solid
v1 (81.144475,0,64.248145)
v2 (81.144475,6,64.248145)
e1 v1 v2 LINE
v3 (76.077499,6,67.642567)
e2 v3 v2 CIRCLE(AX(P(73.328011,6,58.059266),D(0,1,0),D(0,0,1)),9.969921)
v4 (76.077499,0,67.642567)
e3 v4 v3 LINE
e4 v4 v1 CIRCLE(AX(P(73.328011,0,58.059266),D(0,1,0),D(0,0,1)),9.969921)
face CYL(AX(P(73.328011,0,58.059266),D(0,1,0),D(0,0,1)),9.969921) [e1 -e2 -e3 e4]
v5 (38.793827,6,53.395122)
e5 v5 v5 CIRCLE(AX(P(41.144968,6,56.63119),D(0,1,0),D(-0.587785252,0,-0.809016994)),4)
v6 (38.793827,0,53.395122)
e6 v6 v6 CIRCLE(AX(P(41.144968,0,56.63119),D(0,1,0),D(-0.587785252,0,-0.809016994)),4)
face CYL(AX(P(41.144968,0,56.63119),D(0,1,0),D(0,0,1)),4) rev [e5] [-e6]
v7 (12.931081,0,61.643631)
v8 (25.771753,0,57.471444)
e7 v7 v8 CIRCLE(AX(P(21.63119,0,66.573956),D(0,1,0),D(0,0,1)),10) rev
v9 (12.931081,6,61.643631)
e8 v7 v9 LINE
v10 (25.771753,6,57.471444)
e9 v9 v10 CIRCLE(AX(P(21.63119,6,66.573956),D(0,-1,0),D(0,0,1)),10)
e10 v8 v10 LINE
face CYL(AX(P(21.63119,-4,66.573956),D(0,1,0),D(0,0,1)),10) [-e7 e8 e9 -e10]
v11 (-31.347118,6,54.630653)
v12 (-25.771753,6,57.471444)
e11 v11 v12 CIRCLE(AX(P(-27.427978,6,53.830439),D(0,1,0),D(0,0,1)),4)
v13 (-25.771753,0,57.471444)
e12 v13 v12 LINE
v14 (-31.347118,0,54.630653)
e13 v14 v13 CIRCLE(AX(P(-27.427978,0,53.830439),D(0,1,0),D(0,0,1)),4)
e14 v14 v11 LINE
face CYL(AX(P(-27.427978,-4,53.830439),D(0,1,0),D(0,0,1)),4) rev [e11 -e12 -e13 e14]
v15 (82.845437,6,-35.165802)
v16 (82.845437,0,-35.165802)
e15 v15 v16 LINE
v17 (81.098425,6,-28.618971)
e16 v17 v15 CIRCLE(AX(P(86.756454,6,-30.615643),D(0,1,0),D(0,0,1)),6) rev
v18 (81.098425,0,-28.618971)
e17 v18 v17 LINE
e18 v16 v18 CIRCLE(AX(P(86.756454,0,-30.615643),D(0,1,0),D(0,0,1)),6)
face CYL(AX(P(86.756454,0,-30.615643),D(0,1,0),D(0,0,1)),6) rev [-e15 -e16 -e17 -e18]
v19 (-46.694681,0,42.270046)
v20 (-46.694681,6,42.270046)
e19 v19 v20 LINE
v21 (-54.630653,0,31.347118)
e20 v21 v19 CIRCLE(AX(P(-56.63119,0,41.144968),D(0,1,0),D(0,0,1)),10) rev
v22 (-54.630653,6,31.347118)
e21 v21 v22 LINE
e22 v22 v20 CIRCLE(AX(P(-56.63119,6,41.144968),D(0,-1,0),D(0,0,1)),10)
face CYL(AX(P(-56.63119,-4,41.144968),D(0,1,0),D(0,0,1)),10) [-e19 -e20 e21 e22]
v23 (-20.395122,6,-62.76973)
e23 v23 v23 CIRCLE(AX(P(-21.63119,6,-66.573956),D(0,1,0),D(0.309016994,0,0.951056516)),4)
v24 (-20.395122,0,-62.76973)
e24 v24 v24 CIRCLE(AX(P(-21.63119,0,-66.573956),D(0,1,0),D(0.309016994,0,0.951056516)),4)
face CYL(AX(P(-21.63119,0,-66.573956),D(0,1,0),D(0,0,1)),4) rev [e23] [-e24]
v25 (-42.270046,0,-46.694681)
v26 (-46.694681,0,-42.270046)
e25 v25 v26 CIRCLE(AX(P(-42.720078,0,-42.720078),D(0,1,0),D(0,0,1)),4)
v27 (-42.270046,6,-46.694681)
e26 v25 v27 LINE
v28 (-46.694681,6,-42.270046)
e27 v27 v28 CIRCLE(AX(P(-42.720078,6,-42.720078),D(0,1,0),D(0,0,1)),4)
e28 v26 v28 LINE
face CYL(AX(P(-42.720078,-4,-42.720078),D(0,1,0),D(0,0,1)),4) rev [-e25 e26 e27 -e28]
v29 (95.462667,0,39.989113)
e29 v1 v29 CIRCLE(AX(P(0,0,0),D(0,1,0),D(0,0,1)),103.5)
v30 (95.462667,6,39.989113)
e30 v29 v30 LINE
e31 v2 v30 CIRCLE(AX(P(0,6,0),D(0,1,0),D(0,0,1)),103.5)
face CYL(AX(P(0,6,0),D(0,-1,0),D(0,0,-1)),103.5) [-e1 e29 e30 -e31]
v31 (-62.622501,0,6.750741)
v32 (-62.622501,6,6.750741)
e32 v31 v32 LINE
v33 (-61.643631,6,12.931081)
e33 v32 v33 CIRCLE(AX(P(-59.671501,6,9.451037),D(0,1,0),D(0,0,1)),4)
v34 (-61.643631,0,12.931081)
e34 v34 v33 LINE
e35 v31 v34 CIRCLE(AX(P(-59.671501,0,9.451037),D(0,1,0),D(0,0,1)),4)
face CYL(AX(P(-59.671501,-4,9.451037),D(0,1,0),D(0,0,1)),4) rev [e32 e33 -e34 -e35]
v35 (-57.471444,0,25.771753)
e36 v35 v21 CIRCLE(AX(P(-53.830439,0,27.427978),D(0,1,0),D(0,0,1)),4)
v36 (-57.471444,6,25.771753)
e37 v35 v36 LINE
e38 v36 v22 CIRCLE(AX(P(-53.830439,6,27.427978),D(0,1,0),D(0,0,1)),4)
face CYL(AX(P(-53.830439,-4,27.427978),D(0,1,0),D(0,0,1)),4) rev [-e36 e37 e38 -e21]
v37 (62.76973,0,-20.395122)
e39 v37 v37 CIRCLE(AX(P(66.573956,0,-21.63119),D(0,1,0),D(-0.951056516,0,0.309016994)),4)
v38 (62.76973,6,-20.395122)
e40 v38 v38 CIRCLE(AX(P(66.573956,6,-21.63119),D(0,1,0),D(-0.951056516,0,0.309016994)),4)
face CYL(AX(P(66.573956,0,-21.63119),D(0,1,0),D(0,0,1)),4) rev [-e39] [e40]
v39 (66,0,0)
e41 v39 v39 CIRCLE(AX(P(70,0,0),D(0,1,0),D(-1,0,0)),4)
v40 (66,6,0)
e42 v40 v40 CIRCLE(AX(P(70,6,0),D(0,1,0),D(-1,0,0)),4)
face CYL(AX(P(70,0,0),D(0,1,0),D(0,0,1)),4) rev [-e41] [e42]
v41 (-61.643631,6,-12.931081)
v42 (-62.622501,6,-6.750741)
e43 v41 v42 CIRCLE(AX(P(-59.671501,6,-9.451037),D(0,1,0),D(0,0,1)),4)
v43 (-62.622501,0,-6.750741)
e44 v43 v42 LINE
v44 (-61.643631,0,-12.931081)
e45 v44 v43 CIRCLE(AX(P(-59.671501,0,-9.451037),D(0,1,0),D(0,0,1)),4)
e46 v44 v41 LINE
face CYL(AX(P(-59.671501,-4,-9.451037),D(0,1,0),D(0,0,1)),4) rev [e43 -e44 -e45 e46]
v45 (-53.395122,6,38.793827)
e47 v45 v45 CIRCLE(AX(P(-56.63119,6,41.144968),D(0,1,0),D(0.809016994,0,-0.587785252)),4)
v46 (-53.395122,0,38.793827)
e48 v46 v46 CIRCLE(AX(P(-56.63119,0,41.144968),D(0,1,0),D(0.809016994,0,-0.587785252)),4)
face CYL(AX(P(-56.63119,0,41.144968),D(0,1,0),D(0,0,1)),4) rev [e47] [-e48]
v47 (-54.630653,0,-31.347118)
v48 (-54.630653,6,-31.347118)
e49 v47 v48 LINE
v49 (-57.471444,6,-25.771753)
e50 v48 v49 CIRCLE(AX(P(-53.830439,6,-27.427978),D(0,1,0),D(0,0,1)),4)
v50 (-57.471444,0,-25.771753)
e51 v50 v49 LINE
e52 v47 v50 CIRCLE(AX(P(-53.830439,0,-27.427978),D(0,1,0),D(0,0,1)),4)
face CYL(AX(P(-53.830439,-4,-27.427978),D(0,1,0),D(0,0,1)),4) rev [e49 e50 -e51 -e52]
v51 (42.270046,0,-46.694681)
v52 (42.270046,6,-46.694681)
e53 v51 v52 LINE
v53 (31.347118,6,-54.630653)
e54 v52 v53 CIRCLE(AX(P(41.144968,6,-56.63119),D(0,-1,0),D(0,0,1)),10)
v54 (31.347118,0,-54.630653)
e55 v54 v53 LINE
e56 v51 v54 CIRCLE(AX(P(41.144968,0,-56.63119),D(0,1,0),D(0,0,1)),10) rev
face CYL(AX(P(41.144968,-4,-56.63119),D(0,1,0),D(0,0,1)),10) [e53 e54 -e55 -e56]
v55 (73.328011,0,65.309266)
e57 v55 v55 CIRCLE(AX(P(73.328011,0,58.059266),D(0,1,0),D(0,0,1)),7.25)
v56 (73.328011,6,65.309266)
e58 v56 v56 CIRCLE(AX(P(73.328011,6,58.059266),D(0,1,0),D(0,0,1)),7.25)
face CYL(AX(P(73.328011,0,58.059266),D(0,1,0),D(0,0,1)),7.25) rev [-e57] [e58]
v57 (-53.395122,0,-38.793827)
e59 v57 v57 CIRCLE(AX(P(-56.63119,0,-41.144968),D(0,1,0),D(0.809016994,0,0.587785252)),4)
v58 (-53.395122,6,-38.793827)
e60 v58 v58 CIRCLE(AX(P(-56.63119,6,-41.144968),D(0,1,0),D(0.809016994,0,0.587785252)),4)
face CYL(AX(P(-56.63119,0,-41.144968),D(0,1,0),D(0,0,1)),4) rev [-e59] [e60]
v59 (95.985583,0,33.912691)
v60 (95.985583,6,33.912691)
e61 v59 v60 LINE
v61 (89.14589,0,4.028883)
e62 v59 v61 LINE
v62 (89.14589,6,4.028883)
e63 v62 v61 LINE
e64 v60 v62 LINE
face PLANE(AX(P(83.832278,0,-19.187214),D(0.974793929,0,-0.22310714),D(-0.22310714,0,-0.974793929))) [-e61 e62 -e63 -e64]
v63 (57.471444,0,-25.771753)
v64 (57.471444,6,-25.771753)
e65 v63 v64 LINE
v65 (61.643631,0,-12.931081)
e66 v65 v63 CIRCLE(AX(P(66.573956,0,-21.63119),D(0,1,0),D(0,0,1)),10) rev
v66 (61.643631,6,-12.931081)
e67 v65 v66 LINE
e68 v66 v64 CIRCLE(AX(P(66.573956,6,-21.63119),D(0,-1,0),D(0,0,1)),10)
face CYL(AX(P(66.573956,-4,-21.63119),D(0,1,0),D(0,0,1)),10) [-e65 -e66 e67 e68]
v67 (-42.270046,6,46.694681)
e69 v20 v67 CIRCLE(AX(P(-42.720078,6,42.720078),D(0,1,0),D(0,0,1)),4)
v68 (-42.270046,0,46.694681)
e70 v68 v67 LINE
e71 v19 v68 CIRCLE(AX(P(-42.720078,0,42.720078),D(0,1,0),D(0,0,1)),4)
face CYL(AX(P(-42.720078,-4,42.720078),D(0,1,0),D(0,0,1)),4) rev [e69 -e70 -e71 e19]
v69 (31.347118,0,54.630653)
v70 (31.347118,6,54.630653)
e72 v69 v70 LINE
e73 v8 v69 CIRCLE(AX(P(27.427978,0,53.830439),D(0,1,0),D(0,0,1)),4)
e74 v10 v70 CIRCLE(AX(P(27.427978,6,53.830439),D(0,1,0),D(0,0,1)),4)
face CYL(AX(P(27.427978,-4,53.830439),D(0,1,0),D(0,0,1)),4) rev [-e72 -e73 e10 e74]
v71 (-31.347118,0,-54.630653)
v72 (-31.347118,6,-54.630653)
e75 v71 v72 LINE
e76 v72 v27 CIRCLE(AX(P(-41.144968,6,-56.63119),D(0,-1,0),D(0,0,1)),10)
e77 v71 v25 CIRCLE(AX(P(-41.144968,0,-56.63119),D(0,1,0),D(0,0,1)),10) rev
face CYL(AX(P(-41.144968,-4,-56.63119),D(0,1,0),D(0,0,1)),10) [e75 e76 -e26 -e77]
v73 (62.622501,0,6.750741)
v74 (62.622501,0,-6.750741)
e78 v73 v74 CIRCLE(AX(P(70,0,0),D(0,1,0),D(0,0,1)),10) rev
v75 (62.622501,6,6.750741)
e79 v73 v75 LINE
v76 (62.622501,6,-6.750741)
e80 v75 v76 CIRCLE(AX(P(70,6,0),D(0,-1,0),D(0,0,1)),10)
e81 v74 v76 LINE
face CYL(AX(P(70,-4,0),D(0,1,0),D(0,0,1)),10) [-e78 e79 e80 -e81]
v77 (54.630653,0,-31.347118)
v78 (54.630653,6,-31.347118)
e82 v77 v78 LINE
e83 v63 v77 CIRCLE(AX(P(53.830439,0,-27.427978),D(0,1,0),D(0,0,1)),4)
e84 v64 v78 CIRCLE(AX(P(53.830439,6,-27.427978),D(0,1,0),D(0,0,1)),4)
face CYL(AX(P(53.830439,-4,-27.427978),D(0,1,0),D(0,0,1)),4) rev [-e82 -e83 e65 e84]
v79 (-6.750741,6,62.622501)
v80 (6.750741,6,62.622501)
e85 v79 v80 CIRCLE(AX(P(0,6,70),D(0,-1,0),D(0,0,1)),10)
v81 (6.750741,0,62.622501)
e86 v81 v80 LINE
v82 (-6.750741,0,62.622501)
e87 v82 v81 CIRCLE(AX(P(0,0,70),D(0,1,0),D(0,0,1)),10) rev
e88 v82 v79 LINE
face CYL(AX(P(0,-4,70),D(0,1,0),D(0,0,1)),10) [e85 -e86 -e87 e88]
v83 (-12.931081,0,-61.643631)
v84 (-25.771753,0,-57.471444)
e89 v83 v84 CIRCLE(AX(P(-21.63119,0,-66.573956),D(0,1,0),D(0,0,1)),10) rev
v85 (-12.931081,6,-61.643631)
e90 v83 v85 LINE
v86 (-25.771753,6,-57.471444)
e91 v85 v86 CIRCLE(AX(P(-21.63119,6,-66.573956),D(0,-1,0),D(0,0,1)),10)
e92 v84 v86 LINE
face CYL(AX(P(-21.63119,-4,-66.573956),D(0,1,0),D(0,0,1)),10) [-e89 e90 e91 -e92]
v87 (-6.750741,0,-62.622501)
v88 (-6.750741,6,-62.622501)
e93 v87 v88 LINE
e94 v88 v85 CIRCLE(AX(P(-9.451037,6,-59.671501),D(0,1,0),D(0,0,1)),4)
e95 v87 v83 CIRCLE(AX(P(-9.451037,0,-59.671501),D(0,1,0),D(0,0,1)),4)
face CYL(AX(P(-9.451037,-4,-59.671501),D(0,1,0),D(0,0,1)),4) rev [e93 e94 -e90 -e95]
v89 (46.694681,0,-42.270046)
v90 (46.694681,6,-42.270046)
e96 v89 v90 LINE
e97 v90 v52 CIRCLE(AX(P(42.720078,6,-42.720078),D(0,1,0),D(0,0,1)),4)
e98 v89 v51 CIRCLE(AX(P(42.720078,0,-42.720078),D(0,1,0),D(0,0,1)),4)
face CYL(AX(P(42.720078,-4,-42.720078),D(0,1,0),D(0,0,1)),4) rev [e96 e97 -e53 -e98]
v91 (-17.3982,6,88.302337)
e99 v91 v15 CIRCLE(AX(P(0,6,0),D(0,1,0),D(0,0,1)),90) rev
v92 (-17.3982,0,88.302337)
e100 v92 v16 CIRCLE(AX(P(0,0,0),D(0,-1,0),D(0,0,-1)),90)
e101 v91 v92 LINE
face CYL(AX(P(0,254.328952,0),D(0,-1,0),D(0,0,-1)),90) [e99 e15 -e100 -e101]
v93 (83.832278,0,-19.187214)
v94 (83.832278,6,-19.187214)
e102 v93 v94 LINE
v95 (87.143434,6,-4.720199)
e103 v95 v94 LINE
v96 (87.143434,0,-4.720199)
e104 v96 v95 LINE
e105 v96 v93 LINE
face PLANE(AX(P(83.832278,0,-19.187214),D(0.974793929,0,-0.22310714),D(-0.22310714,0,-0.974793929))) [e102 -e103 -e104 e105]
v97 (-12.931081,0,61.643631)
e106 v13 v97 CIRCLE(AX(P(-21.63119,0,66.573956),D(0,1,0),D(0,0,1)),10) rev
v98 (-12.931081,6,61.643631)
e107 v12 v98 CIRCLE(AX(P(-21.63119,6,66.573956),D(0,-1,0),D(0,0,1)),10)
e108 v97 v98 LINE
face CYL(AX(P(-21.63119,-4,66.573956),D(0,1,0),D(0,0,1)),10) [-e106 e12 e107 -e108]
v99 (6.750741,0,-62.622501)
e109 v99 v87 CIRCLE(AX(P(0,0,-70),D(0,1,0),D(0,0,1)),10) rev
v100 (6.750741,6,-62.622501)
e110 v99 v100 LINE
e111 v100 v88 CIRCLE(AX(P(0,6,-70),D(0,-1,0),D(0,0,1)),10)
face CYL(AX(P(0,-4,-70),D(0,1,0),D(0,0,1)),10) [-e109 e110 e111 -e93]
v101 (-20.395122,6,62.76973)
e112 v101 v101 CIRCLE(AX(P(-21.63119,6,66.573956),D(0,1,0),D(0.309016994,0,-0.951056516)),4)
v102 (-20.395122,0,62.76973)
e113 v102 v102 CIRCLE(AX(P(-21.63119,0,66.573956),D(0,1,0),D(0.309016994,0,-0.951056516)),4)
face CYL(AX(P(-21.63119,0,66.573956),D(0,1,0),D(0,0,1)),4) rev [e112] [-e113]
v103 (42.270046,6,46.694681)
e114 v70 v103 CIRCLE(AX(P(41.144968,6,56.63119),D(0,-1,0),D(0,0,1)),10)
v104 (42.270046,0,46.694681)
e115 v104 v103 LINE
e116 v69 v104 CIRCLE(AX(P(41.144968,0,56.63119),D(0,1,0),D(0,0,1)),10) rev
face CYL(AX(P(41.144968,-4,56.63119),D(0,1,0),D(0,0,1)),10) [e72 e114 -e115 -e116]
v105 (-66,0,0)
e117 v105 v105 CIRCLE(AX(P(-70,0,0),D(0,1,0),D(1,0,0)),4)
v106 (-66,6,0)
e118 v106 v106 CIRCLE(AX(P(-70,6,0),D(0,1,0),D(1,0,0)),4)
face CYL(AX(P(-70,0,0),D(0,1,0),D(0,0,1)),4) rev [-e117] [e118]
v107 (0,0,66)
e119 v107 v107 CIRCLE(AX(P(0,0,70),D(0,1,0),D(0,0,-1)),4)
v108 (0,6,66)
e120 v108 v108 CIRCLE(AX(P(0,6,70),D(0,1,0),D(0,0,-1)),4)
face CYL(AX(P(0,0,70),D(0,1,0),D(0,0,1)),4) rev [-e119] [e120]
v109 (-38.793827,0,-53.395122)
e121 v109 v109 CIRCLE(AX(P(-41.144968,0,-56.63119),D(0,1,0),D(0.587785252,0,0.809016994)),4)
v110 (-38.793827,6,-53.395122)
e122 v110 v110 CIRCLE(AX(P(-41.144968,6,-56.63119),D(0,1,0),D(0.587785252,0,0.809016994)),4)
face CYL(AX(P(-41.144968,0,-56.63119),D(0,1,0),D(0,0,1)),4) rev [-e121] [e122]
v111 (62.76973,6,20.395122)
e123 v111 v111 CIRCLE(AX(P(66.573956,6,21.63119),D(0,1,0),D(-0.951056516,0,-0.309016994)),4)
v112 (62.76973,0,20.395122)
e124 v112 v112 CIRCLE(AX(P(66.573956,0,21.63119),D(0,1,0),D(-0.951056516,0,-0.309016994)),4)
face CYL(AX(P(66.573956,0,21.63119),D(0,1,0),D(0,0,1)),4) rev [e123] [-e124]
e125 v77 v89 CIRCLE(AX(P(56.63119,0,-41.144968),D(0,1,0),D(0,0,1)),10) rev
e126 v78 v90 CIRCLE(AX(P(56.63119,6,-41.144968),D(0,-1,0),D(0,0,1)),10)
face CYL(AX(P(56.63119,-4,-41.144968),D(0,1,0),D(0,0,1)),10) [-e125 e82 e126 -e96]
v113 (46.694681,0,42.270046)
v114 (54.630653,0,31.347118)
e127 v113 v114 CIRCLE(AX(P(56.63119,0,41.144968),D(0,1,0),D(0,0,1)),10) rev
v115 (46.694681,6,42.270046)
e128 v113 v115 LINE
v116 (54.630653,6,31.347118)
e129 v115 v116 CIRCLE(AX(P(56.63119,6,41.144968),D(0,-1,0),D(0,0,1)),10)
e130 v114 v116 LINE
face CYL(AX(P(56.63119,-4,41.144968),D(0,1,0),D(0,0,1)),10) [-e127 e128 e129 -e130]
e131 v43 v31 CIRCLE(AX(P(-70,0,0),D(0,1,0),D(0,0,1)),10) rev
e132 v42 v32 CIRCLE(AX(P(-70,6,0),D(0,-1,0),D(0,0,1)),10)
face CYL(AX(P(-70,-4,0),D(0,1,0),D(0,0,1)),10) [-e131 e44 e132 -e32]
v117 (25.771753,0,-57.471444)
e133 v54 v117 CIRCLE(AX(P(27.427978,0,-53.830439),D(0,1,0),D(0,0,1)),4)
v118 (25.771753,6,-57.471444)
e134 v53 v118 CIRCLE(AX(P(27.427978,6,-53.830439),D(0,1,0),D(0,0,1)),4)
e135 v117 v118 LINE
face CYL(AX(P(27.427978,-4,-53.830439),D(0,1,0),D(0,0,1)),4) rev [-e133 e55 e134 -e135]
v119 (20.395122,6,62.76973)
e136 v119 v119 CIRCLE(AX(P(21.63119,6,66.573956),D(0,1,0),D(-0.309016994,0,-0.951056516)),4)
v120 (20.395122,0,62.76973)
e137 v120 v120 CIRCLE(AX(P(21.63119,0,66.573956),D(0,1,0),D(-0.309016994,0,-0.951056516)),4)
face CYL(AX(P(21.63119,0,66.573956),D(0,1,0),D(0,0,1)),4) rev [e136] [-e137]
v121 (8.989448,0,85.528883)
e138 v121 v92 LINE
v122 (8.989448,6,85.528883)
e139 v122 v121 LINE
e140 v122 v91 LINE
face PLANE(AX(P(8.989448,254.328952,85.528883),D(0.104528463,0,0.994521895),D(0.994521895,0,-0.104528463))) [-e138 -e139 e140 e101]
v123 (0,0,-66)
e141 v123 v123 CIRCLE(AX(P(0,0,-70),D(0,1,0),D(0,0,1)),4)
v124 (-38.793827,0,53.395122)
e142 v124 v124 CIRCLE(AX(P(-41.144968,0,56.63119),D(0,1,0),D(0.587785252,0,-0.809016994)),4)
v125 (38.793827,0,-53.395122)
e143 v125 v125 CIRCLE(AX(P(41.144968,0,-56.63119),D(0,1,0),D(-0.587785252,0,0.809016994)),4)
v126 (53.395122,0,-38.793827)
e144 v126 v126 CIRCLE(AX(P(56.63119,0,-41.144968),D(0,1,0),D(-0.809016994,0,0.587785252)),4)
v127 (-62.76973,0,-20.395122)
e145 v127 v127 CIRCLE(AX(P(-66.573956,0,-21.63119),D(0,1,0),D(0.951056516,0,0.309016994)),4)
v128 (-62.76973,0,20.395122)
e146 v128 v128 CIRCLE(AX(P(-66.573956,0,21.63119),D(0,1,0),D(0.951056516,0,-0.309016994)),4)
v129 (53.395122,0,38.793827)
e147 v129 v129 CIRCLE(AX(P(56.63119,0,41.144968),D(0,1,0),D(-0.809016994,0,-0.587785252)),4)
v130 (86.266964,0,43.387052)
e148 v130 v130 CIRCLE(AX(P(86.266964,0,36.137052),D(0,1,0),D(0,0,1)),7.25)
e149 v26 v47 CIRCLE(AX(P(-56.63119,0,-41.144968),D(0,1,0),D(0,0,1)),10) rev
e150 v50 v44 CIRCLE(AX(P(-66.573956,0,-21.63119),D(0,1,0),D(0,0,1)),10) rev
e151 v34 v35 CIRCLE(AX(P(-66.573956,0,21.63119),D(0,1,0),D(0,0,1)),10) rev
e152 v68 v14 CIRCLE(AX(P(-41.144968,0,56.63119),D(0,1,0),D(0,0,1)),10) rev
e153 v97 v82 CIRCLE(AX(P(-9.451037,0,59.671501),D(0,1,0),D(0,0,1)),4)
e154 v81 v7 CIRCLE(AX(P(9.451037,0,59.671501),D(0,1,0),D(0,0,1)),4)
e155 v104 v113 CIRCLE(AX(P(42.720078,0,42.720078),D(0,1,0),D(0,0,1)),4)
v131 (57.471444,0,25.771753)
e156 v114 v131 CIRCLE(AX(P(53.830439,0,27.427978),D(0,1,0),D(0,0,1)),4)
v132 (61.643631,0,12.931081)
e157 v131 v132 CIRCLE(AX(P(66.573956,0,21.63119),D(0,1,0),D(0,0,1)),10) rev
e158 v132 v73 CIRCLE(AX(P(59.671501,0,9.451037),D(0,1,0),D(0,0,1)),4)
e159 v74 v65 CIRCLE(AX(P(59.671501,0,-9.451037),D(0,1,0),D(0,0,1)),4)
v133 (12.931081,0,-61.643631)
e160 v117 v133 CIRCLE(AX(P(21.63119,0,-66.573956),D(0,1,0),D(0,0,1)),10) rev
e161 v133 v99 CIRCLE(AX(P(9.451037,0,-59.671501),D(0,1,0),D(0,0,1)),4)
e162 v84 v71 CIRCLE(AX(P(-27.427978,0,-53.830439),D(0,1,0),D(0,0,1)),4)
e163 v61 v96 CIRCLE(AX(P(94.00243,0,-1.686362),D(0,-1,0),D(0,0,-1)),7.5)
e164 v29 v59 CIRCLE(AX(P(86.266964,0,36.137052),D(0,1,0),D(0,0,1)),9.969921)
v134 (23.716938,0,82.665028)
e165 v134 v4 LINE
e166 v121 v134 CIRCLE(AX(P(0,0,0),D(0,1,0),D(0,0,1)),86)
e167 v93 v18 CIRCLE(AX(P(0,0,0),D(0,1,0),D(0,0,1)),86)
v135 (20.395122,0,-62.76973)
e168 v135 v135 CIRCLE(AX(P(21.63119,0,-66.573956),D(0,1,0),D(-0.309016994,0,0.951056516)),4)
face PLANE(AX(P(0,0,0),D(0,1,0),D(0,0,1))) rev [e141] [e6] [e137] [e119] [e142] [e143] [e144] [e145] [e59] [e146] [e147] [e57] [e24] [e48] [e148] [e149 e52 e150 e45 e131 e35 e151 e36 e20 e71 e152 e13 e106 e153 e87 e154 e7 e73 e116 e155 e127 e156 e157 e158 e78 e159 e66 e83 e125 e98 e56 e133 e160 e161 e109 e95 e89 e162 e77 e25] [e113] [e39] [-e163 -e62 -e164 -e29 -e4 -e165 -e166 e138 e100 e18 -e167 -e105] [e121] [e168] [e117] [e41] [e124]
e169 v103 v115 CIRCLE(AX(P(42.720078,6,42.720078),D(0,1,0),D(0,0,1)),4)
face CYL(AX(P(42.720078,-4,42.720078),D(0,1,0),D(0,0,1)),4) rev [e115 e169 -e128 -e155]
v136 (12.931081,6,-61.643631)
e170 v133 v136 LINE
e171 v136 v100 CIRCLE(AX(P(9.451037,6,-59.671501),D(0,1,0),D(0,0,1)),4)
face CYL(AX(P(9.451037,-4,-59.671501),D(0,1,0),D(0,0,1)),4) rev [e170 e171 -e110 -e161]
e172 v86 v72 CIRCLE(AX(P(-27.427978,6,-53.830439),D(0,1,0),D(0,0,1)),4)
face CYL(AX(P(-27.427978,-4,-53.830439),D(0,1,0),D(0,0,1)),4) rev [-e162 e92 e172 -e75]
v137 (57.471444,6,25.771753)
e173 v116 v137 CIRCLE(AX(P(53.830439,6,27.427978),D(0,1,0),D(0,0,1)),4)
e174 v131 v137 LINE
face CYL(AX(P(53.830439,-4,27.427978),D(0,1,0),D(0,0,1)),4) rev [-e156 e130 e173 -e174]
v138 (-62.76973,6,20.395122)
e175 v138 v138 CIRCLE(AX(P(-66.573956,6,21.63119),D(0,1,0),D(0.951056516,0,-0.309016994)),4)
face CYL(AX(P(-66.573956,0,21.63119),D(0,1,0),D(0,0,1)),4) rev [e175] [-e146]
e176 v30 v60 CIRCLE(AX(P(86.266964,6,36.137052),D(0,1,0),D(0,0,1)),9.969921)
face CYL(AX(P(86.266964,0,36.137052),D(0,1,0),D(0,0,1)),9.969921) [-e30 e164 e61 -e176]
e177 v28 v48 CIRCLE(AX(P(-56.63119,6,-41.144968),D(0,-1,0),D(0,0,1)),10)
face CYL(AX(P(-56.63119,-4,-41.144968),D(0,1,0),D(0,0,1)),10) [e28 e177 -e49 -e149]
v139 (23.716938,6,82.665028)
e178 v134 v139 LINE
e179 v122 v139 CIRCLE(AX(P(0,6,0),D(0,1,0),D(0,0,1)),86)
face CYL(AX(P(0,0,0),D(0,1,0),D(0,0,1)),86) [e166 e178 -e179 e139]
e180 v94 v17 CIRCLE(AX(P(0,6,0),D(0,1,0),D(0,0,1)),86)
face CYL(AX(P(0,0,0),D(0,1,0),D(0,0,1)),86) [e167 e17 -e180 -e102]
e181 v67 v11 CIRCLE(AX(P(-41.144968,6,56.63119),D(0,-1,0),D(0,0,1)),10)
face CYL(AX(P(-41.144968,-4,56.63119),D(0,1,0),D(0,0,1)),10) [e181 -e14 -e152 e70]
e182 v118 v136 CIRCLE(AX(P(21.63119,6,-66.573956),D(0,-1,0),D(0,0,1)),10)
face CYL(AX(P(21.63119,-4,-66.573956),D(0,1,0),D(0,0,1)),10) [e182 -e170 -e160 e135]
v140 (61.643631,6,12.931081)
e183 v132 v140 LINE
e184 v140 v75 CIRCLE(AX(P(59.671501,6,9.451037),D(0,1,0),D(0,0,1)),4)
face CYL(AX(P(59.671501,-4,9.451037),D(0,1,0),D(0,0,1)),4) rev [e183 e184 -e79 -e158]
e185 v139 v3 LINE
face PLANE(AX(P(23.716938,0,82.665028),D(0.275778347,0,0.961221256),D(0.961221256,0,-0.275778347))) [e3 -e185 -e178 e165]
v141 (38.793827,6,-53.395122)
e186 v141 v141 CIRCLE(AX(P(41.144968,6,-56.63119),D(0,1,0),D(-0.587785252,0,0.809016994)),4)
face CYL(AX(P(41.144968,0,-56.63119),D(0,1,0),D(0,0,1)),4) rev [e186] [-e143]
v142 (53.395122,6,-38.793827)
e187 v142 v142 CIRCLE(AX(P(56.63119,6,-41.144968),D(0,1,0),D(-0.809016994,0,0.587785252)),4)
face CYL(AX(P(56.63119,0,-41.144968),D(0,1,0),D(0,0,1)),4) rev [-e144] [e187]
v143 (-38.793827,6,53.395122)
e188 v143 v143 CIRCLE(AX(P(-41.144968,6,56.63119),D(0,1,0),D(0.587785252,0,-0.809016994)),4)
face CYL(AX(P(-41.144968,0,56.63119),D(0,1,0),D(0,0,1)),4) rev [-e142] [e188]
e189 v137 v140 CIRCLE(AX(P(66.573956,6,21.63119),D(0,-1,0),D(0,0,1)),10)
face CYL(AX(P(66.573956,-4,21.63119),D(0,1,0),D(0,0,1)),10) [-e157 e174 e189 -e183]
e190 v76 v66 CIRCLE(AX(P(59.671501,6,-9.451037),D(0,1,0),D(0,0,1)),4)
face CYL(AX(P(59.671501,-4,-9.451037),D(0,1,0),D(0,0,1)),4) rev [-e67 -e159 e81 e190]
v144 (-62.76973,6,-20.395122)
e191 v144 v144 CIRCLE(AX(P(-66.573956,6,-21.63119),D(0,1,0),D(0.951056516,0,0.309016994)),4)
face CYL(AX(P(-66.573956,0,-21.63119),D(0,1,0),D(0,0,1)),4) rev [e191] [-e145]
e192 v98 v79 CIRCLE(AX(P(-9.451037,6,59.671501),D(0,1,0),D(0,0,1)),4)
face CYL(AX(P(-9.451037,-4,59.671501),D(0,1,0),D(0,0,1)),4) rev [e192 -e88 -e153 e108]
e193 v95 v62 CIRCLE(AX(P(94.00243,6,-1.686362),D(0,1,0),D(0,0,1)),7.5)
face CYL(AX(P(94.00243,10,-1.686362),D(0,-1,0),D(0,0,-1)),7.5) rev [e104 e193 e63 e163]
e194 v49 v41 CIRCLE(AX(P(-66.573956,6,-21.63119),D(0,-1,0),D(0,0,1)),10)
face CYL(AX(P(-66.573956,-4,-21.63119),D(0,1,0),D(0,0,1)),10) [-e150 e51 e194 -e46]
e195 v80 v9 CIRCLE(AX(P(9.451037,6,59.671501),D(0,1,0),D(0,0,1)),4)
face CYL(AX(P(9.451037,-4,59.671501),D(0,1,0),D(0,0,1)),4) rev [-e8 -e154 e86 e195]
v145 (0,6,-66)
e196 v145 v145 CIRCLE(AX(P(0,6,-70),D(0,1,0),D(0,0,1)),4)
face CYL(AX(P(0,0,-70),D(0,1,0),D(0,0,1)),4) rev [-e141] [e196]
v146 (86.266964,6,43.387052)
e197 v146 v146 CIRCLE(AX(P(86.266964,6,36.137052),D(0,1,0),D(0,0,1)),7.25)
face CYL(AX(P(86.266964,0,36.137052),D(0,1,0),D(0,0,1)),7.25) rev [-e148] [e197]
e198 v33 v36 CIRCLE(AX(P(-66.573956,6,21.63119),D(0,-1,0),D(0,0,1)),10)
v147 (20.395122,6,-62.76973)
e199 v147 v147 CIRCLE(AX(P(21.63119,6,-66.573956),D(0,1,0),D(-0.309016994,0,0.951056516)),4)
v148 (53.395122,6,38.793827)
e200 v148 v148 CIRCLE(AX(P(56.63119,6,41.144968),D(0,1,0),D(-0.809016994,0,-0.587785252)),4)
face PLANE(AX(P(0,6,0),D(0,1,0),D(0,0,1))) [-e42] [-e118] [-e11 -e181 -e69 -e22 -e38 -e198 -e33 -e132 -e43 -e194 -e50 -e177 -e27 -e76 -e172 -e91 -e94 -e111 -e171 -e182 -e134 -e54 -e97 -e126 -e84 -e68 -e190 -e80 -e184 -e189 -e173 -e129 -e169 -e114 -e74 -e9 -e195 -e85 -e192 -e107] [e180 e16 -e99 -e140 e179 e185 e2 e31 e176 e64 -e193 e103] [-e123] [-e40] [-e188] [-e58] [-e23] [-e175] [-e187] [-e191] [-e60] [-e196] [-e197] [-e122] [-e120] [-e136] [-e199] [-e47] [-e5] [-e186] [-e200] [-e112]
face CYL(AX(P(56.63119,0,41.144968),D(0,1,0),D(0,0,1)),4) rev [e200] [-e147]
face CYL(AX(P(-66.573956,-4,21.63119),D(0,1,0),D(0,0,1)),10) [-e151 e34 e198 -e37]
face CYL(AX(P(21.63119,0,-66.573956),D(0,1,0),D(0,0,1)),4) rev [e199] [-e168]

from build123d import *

# Parameters (mm, degrees)
SKETCH1_R           = 103.5
SKETCH1_R_2         = 60
BOSS_EXTRUDE1_DEPTH = 6
SKETCH2_R           = 4
CUT_EXTRUDE1_DEPTH  = 147.494027182
CIRPATTERN1_COUNT   = 20
SKETCH3_R           = 7.25
CUT_EXTRUDE2_DEPTH  = 6
SKETCH4_OUTSIDE_W   = 267.56
SKETCH4_OUTSIDE_H   = 267.56
CUT_EXTRUDE3_DEPTH  = 147.494027182
CUT_EXTRUDE4_DEPTH  = 10
BOSS_EXTRUDE2_START = -6
BOSS_EXTRUDE2_DEPTH = 6
FILLET1_R           = 6
SKETCH7_R           = 7.5
CUT_EXTRUDE5_DEPTH  = 10


with BuildPart() as part:
    # Sketch1 → Boss-Extrude1 (new body)
    with BuildSketch(Plane(origin=(0, 0, 0), x_dir=(1, 0, 0), z_dir=(0, 1, 0))):
        with Locations(Location((0, 0, 0), (0, 0, 270))):
            Circle(SKETCH1_R)
        with Locations(Location((0, 0, 0), (0, 0, 270))):
            Circle(SKETCH1_R_2, mode=Mode.SUBTRACT)
    extrude(amount=BOSS_EXTRUDE1_DEPTH)

    # Sketch2 → Cut-Extrude1 (cut, through all)
    with BuildSketch(Plane(origin=(0, 6, 0), x_dir=(1, 0, 0), z_dir=(0, 1, 0))):
        with Locations(Location((0, 70, 0), (0, 0, 270))):
            Circle(SKETCH2_R)
    cut_extrude1 = extrude(amount=-CUT_EXTRUDE1_DEPTH, mode=Mode.SUBTRACT)

    # CirPattern1: Cut-Extrude1 ×20 about axis
    cirpattern1_axis = Axis((0, 0, 0), (0, 1, 0))
    for i in range(1, CIRPATTERN1_COUNT):
        add(cut_extrude1.rotate(cirpattern1_axis, i * 360 / CIRPATTERN1_COUNT), mode=Mode.SUBTRACT)

    # Sketch3 → Cut-Extrude2 (cut)
    with BuildSketch(Plane(origin=(0, 6, 0), x_dir=(1, 0, 0), z_dir=(0, 1, 0))):
        with Locations(Location((86.266964059, -36.13705179, 0), (0, 0, 270))):
            Circle(SKETCH3_R)
        with Locations(Location((73.328010939, -58.059266372, 0), (0, 0, 270))):
            Circle(SKETCH3_R)
    extrude(amount=-CUT_EXTRUDE2_DEPTH, mode=Mode.SUBTRACT)

    # Sketch4 outside → Cut-Extrude3 (cut, through all)
    with BuildSketch(Plane(origin=(0, 6, 0), x_dir=(1, 0, 0), z_dir=(0, 1, 0))):
        Rectangle(SKETCH4_OUTSIDE_W, SKETCH4_OUTSIDE_H)
        with BuildLine():
            Line((23.716937817, -82.665028038), (76.077499384, -67.64256676))
            ThreePointArc((76.077499384, -67.64256676), (78.876917409, -66.342319555), (81.144475094, -64.248145201))
            ThreePointArc((81.144475094, -64.248145201), (89.13274289, -52.60802358), (95.46266736, -39.989112774))
            ThreePointArc((95.46266736, -39.989112774), (96.200172038, -36.991868886), (95.985582928, -33.91269114))
            Line((95.985582928, -33.91269114), (83.832277903, 19.187214014))
            ThreePointArc((83.832277903, 19.187214014), (-74.061989261, 43.712947129), (23.716937817, -82.665028038))
        make_face(mode=Mode.SUBTRACT)
    extrude(amount=-CUT_EXTRUDE3_DEPTH, mode=Mode.SUBTRACT)

    # Sketch5 → Cut-Extrude4 (cut)
    with BuildSketch(Plane(origin=(0, 6, 0), x_dir=(1, 0, 0), z_dir=(0, 1, 0))):
        with BuildLine():
            ThreePointArc((46.694681279, 42.270046437), (48.541019662, 35.267115138), (54.63065317, 31.347118204))
            ThreePointArc((54.63065317, 31.347118204), (57.394464692, 29.243940421), (57.471443608, 25.771753046))
            ThreePointArc((57.471443608, 25.771753046), (57.063390978, 18.541019662), (61.643630936, 12.931080792))
            ThreePointArc((61.643630936, 12.931080792), (63.622254217, 10.076775126), (62.622500611, 6.750740904))
            ThreePointArc((62.622500611, 6.750740904), (60, 0), (62.622500611, -6.750740904))
            ThreePointArc((62.622500611, -6.750740904), (63.622254217, -10.076775126), (61.643630936, -12.931080792))
            ThreePointArc((61.643630936, -12.931080792), (57.063390978, -18.541019662), (57.471443608, -25.771753046))
            ThreePointArc((57.471443608, -25.771753046), (57.394464692, -29.243940421), (54.63065317, -31.347118204))
            ThreePointArc((54.63065317, -31.347118204), (48.541019662, -35.267115138), (46.694681279, -42.270046437))
            ThreePointArc((46.694681279, -42.270046437), (45.548505072, -45.548505072), (42.270046437, -46.694681279))
            ThreePointArc((42.270046437, -46.694681279), (35.267115138, -48.541019662), (31.347118204, -54.63065317))
            ThreePointArc((31.347118204, -54.63065317), (29.243940421, -57.394464692), (25.771753046, -57.471443608))
            ThreePointArc((25.771753046, -57.471443608), (18.541019662, -57.063390978), (12.931080792, -61.643630936))
            ThreePointArc((12.931080792, -61.643630936), (10.076775126, -63.622254217), (6.750740904, -62.622500611))
            ThreePointArc((6.750740904, -62.622500611), (0, -60), (-6.750740904, -62.622500611))
            ThreePointArc((-6.750740904, -62.622500611), (-10.076775126, -63.622254217), (-12.931080792, -61.643630936))
            ThreePointArc((-12.931080792, -61.643630936), (-18.541019662, -57.063390978), (-25.771753046, -57.471443608))
            ThreePointArc((-25.771753046, -57.471443608), (-29.243940421, -57.394464692), (-31.347118204, -54.63065317))
            ThreePointArc((-31.347118204, -54.63065317), (-35.267115138, -48.541019662), (-42.270046437, -46.694681279))
            ThreePointArc((-42.270046437, -46.694681279), (-45.548505072, -45.548505072), (-46.694681279, -42.270046437))
            ThreePointArc((-46.694681279, -42.270046437), (-48.541019662, -35.267115138), (-54.63065317, -31.347118204))
            ThreePointArc((-54.63065317, -31.347118204), (-57.394464692, -29.243940421), (-57.471443608, -25.771753046))
            ThreePointArc((-57.471443608, -25.771753046), (-57.063390978, -18.541019662), (-61.643630936, -12.931080792))
            ThreePointArc((-61.643630936, -12.931080792), (-63.622254217, -10.076775126), (-62.622500611, -6.750740904))
            ThreePointArc((-62.622500611, -6.750740904), (-60, 0), (-62.622500611, 6.750740904))
            ThreePointArc((-62.622500611, 6.750740904), (-63.622254217, 10.076775126), (-61.643630936, 12.931080792))
            ThreePointArc((-61.643630936, 12.931080792), (-57.063390978, 18.541019662), (-57.471443608, 25.771753046))
            ThreePointArc((-57.471443608, 25.771753046), (-57.394464692, 29.243940421), (-54.63065317, 31.347118204))
            ThreePointArc((-54.63065317, 31.347118204), (-48.541019662, 35.267115138), (-46.694681279, 42.270046437))
            ThreePointArc((-46.694681279, 42.270046437), (-45.548505072, 45.548505072), (-42.270046437, 46.694681279))
            ThreePointArc((-42.270046437, 46.694681279), (-35.267115138, 48.541019662), (-31.347118204, 54.63065317))
            ThreePointArc((-31.347118204, 54.63065317), (-29.243940421, 57.394464692), (-25.771753046, 57.471443608))
            ThreePointArc((-25.771753046, 57.471443608), (-18.541019662, 57.063390978), (-12.931080792, 61.643630936))
            ThreePointArc((-12.931080792, 61.643630936), (-10.076775126, 63.622254217), (-6.750740904, 62.622500611))
            ThreePointArc((-6.750740904, 62.622500611), (0, 60), (6.750740904, 62.622500611))
            ThreePointArc((6.750740904, 62.622500611), (10.076775126, 63.622254217), (12.931080792, 61.643630936))
            ThreePointArc((12.931080792, 61.643630936), (18.541019662, 57.063390978), (25.771753046, 57.471443608))
            ThreePointArc((25.771753046, 57.471443608), (29.243940421, 57.394464692), (31.347118204, 54.63065317))
            ThreePointArc((31.347118204, 54.63065317), (35.267115138, 48.541019662), (42.270046437, 46.694681279))
            ThreePointArc((42.270046437, 46.694681279), (45.548505072, 45.548505072), (46.694681279, 42.270046437))
        make_face()
    extrude(amount=-CUT_EXTRUDE4_DEPTH, mode=Mode.SUBTRACT)

    # Sketch6 → Boss-Extrude2 (add)
    with BuildSketch(Plane.XZ.offset(BOSS_EXTRUDE2_START)):
        with BuildLine():
            Line((8.989447841, 85.528883002), (-17.398199941, 88.302336542))
            ThreePointArc((-17.398199941, 88.302336542), (-69.870812829, -56.728031119), (82.845436811, -35.165801564))
            Line((82.845436811, -35.165801564), (79.163417397, -33.60287705))
            ThreePointArc((79.163417397, -33.60287705), (-74.100107798, -43.648299215), (8.989447841, 85.528883002))
        make_face()
    extrude(amount=BOSS_EXTRUDE2_DEPTH)

    # Fillet1
    # the kernel refuses this fillet: 6 mm, written as the material it adds along each edge
    with BuildSketch(Plane(origin=(79.163417397, 6, -33.60287705), x_dir=(0.3619298171455144, 0, 0.9322053461877455), z_dir=(0, -1, 0))) as fillet1_piece_1:
        with BuildLine():
            CenterArc((5.532861862, -5.997100749), FILLET1_R, 91.781239909, 68.757327573)
            Line((-0.124333974, -3.998067166), (-0.237477891, -3.958086494))
            ThreePointArc((-0.237477891, -3.958086494), (-0.182109002, -1.995303564), (-0.119942015, 0.003730019))
            Line((-0.119942015, 0.003730019), (0.003730019, 0.119942015))
            ThreePointArc((0.003730019, 0.119942015), (2.67318045, 0.078444066), (5.342630881, 0.119942015))
            Line((5.342630881, 0.119942015), (5.346360901, 0))
        make_face()
    extrude(amount=6)

    # Sketch7 → Cut-Extrude5 (cut)
    with BuildSketch(Plane.XZ):
        with Locations((94.002430013, -1.686361811)):
            Circle(SKETCH7_R)
    extrude(amount=-CUT_EXTRUDE5_DEPTH, mode=Mode.SUBTRACT)


solid = part.part
